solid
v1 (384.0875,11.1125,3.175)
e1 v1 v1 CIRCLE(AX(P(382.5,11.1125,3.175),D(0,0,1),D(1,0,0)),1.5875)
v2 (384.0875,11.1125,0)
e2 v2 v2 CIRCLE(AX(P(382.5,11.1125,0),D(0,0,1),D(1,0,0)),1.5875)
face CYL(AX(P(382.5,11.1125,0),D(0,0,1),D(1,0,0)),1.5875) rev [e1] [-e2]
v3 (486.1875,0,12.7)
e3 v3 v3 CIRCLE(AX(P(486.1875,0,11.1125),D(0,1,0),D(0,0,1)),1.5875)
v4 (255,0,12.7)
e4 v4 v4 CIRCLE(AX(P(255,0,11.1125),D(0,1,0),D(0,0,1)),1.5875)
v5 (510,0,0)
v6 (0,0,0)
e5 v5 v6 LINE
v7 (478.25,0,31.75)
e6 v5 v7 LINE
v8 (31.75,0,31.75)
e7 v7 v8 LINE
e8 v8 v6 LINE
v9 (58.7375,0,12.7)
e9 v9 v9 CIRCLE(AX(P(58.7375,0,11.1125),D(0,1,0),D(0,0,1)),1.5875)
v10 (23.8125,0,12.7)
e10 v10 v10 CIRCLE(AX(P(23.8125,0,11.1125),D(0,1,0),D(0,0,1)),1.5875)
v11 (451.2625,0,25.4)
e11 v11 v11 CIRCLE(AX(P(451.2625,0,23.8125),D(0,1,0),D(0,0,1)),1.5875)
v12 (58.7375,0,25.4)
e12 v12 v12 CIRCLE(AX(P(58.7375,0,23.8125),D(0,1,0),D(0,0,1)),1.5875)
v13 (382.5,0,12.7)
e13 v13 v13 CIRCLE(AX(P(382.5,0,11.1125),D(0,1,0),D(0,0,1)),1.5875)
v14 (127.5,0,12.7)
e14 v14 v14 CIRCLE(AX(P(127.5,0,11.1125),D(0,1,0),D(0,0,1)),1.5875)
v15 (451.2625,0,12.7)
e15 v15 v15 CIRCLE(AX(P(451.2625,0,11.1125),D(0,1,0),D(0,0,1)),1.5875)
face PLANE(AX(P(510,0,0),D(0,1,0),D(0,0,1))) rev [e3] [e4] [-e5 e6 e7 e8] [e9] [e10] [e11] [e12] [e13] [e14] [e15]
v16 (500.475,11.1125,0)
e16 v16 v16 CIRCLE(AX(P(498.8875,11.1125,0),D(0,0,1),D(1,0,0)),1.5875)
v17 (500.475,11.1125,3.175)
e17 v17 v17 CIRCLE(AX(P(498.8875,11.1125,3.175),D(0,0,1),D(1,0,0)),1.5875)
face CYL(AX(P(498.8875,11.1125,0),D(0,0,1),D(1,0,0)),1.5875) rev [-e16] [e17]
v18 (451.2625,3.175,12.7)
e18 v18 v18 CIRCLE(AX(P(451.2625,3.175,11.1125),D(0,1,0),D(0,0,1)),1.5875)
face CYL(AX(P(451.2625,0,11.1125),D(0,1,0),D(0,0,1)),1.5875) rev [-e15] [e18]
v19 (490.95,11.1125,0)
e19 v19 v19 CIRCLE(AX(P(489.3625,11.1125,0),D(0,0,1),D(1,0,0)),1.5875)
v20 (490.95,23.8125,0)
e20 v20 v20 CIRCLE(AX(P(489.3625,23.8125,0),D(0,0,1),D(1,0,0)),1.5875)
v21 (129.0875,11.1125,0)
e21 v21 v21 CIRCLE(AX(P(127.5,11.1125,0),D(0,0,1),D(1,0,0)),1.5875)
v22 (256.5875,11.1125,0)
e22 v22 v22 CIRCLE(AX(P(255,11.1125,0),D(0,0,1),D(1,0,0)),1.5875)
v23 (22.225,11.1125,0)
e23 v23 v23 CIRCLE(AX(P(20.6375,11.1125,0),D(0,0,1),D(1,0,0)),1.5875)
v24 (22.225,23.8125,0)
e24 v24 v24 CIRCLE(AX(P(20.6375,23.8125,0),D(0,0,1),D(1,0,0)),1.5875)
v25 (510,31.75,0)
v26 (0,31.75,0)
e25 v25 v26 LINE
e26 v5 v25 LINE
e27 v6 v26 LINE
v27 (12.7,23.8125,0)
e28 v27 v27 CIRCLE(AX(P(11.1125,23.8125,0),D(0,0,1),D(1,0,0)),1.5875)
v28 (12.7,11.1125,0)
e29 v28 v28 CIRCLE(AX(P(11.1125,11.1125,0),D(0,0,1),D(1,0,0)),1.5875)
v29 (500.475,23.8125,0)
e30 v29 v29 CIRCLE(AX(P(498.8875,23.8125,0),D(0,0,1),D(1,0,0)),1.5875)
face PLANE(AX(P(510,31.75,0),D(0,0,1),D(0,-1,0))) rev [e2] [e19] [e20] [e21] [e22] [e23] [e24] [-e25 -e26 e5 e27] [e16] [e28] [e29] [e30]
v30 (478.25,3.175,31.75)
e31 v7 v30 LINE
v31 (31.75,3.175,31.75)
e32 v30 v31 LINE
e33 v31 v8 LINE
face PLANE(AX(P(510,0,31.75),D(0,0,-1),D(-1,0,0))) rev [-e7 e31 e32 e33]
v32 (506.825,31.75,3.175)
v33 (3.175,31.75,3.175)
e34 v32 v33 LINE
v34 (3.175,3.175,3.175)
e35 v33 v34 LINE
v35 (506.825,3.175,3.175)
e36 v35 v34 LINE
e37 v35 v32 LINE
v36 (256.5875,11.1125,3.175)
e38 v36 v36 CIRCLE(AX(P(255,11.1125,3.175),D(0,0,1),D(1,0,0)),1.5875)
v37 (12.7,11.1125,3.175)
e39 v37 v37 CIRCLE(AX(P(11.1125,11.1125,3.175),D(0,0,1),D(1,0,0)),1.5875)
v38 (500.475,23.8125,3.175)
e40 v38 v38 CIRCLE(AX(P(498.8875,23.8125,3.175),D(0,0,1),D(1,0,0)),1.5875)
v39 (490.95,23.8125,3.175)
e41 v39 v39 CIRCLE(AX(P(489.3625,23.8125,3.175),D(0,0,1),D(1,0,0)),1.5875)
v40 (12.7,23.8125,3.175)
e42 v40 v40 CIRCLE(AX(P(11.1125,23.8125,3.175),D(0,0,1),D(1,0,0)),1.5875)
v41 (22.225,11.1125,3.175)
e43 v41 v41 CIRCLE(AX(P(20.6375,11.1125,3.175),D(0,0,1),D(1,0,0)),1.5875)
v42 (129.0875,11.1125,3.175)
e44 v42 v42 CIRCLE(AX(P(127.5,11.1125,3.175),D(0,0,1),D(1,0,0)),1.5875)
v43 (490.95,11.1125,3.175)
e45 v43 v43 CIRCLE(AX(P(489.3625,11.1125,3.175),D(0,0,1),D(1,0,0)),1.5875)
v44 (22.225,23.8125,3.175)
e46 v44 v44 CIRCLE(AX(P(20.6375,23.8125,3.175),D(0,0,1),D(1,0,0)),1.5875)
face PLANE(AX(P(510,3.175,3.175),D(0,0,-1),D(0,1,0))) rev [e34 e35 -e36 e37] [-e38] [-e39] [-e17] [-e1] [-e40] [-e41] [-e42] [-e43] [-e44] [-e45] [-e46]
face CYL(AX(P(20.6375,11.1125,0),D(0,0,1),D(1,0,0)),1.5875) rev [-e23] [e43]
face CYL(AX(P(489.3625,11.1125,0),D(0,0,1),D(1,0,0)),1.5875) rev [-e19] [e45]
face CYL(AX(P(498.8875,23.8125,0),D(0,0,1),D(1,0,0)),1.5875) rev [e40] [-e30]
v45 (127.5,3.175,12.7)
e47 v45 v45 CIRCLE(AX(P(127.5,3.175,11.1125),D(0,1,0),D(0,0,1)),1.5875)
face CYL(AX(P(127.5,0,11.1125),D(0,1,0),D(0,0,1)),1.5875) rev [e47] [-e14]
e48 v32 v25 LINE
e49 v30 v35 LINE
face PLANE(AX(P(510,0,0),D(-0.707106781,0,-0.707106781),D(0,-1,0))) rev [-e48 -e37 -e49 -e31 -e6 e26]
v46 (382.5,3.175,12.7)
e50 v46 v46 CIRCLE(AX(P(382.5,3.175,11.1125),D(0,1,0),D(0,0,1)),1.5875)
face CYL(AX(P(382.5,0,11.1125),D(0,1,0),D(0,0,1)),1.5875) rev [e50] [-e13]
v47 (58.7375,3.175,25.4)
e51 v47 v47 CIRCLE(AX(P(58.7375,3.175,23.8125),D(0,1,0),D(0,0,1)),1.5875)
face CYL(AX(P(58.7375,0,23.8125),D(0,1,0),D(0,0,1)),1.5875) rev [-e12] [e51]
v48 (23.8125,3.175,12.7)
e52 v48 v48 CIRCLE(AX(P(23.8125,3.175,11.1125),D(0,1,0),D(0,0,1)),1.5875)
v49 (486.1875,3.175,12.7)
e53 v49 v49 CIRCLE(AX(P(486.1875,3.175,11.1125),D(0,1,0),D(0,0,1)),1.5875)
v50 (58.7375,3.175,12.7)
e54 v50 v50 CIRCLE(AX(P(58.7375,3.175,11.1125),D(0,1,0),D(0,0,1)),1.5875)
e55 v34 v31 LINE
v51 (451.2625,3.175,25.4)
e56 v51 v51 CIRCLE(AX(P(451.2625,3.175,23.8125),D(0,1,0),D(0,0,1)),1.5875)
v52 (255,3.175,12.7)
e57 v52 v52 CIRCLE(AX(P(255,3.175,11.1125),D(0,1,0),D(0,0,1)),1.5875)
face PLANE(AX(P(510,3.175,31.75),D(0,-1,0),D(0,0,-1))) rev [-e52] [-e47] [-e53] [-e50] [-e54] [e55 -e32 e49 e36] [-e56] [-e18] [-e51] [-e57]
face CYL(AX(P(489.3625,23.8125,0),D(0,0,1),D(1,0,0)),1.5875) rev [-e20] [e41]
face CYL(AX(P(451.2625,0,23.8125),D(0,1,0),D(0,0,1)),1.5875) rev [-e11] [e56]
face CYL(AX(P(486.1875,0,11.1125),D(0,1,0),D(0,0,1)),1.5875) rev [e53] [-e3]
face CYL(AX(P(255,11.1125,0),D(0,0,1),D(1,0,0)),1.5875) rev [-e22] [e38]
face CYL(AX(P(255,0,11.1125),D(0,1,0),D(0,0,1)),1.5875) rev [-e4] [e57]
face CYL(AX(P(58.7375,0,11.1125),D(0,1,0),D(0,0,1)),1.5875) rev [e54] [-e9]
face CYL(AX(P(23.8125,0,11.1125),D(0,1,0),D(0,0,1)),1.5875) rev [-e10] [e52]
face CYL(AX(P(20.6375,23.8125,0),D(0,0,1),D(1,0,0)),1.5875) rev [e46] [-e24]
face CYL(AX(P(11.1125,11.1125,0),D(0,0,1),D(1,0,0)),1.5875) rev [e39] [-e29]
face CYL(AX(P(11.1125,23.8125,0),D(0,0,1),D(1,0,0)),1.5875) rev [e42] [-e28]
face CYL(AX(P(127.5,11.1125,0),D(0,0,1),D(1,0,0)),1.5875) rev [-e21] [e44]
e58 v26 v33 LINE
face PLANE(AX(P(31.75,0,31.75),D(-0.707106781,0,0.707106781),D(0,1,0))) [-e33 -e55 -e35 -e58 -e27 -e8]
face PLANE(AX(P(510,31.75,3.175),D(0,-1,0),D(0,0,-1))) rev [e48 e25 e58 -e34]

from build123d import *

# Parameters (mm, degrees)
BOSS_EXTRUDE1_DEPTH           = 510
CHAMFER6_SIZE                 = 31.75
CHAMFER7_SIZE                 = 31.75
TOPHOLES_SKETCH3_R            = 1.5875
TOPHOLES_CUT_EXTRUDE2_DEPTH   = 512.785690622
FRONTHOLES_SKETCH4_R          = 1.5875
FRONTHOLES_CUT_EXTRUDE3_DEPTH = 512.785690622


with BuildPart() as part:
    # Sketch1 → Boss-Extrude1 (new body)
    with BuildSketch(Plane(origin=(0, 0, 0), x_dir=(0, 0, -1), z_dir=(1, 0, 0))):
        Polygon((0, 0), (-31.75, 0), (-31.75, 3.175), (-3.175, 3.175), (-3.175, 31.75), (0, 31.75), align=None)
    extrude(amount=BOSS_EXTRUDE1_DEPTH)

    # Chamfer6
    chamfer6_edges = [part.edges().sort_by_distance(p)[0] for p in [
        (510, 1.5875, 31.75),
    ]]
    chamfer(chamfer6_edges, length=CHAMFER6_SIZE - 0.0001)  # a hair under: the kernel refuses the full size

    # Chamfer7
    chamfer7_edges = [part.edges().sort_by_distance(p)[0] for p in [
        (0, 1.5875, 31.75),
    ]]
    chamfer(chamfer7_edges, length=CHAMFER7_SIZE - 0.0001)  # a hair under: the kernel refuses the full size

    # TopHoles-Sketch3 → TopHoles-Cut-Extrude2 (cut, through all)
    with BuildSketch(Plane(origin=(0, 3.175, 0), x_dir=(1, 0, 0), z_dir=(0, 1, 0))):
        with Locations(Location((58.7375, -23.8125, 0), (0, 0, 270))):
            Circle(TOPHOLES_SKETCH3_R)
        with Locations(Location((451.2625, -23.8125, 0), (0, 0, 270))):
            Circle(TOPHOLES_SKETCH3_R)
        with Locations(Location((451.2625, -11.1125, 0), (0, 0, 270))):
            Circle(TOPHOLES_SKETCH3_R)
        with Locations(Location((58.7375, -11.1125, 0), (0, 0, 270))):
            Circle(TOPHOLES_SKETCH3_R)
        with Locations(Location((486.1875, -11.1125, 0), (0, 0, 270))):
            Circle(TOPHOLES_SKETCH3_R)
        with Locations(Location((23.8125, -11.1125, 0), (0, 0, 270))):
            Circle(TOPHOLES_SKETCH3_R)
        with Locations(Location((127.5, -11.1125, 0), (0, 0, 270))):
            Circle(TOPHOLES_SKETCH3_R)
        with Locations(Location((255, -11.1125, 0), (0, 0, 270))):
            Circle(TOPHOLES_SKETCH3_R)
        with Locations(Location((382.5, -11.1125, 0), (0, 0, 270))):
            Circle(TOPHOLES_SKETCH3_R)
    extrude(amount=-TOPHOLES_CUT_EXTRUDE2_DEPTH, mode=Mode.SUBTRACT)

    # FrontHoles-Sketch4 → FrontHoles-Cut-Extrude3 (cut, through all)
    with BuildSketch(Plane.XY.offset(3.175)):
        with Locations((11.1125, 23.8125)):
            Circle(FRONTHOLES_SKETCH4_R)
        with Locations((489.3625, 23.8125)):
            Circle(FRONTHOLES_SKETCH4_R)
        with Locations((20.6375, 23.8125)):
            Circle(FRONTHOLES_SKETCH4_R)
        with Locations((498.8875, 23.8125)):
            Circle(FRONTHOLES_SKETCH4_R)
        with Locations((11.1125, 11.1125)):
            Circle(FRONTHOLES_SKETCH4_R)
        with Locations((20.6375, 11.1125)):
            Circle(FRONTHOLES_SKETCH4_R)
        with Locations((489.3625, 11.1125)):
            Circle(FRONTHOLES_SKETCH4_R)
        with Locations((498.8875, 11.1125)):
            Circle(FRONTHOLES_SKETCH4_R)
        with Locations((127.5, 11.1125)):
            Circle(FRONTHOLES_SKETCH4_R)
        with Locations((255, 11.1125)):
            Circle(FRONTHOLES_SKETCH4_R)
        with Locations((382.5, 11.1125)):
            Circle(FRONTHOLES_SKETCH4_R)
    extrude(amount=-FRONTHOLES_CUT_EXTRUDE3_DEPTH, mode=Mode.SUBTRACT)


solid = part.part
